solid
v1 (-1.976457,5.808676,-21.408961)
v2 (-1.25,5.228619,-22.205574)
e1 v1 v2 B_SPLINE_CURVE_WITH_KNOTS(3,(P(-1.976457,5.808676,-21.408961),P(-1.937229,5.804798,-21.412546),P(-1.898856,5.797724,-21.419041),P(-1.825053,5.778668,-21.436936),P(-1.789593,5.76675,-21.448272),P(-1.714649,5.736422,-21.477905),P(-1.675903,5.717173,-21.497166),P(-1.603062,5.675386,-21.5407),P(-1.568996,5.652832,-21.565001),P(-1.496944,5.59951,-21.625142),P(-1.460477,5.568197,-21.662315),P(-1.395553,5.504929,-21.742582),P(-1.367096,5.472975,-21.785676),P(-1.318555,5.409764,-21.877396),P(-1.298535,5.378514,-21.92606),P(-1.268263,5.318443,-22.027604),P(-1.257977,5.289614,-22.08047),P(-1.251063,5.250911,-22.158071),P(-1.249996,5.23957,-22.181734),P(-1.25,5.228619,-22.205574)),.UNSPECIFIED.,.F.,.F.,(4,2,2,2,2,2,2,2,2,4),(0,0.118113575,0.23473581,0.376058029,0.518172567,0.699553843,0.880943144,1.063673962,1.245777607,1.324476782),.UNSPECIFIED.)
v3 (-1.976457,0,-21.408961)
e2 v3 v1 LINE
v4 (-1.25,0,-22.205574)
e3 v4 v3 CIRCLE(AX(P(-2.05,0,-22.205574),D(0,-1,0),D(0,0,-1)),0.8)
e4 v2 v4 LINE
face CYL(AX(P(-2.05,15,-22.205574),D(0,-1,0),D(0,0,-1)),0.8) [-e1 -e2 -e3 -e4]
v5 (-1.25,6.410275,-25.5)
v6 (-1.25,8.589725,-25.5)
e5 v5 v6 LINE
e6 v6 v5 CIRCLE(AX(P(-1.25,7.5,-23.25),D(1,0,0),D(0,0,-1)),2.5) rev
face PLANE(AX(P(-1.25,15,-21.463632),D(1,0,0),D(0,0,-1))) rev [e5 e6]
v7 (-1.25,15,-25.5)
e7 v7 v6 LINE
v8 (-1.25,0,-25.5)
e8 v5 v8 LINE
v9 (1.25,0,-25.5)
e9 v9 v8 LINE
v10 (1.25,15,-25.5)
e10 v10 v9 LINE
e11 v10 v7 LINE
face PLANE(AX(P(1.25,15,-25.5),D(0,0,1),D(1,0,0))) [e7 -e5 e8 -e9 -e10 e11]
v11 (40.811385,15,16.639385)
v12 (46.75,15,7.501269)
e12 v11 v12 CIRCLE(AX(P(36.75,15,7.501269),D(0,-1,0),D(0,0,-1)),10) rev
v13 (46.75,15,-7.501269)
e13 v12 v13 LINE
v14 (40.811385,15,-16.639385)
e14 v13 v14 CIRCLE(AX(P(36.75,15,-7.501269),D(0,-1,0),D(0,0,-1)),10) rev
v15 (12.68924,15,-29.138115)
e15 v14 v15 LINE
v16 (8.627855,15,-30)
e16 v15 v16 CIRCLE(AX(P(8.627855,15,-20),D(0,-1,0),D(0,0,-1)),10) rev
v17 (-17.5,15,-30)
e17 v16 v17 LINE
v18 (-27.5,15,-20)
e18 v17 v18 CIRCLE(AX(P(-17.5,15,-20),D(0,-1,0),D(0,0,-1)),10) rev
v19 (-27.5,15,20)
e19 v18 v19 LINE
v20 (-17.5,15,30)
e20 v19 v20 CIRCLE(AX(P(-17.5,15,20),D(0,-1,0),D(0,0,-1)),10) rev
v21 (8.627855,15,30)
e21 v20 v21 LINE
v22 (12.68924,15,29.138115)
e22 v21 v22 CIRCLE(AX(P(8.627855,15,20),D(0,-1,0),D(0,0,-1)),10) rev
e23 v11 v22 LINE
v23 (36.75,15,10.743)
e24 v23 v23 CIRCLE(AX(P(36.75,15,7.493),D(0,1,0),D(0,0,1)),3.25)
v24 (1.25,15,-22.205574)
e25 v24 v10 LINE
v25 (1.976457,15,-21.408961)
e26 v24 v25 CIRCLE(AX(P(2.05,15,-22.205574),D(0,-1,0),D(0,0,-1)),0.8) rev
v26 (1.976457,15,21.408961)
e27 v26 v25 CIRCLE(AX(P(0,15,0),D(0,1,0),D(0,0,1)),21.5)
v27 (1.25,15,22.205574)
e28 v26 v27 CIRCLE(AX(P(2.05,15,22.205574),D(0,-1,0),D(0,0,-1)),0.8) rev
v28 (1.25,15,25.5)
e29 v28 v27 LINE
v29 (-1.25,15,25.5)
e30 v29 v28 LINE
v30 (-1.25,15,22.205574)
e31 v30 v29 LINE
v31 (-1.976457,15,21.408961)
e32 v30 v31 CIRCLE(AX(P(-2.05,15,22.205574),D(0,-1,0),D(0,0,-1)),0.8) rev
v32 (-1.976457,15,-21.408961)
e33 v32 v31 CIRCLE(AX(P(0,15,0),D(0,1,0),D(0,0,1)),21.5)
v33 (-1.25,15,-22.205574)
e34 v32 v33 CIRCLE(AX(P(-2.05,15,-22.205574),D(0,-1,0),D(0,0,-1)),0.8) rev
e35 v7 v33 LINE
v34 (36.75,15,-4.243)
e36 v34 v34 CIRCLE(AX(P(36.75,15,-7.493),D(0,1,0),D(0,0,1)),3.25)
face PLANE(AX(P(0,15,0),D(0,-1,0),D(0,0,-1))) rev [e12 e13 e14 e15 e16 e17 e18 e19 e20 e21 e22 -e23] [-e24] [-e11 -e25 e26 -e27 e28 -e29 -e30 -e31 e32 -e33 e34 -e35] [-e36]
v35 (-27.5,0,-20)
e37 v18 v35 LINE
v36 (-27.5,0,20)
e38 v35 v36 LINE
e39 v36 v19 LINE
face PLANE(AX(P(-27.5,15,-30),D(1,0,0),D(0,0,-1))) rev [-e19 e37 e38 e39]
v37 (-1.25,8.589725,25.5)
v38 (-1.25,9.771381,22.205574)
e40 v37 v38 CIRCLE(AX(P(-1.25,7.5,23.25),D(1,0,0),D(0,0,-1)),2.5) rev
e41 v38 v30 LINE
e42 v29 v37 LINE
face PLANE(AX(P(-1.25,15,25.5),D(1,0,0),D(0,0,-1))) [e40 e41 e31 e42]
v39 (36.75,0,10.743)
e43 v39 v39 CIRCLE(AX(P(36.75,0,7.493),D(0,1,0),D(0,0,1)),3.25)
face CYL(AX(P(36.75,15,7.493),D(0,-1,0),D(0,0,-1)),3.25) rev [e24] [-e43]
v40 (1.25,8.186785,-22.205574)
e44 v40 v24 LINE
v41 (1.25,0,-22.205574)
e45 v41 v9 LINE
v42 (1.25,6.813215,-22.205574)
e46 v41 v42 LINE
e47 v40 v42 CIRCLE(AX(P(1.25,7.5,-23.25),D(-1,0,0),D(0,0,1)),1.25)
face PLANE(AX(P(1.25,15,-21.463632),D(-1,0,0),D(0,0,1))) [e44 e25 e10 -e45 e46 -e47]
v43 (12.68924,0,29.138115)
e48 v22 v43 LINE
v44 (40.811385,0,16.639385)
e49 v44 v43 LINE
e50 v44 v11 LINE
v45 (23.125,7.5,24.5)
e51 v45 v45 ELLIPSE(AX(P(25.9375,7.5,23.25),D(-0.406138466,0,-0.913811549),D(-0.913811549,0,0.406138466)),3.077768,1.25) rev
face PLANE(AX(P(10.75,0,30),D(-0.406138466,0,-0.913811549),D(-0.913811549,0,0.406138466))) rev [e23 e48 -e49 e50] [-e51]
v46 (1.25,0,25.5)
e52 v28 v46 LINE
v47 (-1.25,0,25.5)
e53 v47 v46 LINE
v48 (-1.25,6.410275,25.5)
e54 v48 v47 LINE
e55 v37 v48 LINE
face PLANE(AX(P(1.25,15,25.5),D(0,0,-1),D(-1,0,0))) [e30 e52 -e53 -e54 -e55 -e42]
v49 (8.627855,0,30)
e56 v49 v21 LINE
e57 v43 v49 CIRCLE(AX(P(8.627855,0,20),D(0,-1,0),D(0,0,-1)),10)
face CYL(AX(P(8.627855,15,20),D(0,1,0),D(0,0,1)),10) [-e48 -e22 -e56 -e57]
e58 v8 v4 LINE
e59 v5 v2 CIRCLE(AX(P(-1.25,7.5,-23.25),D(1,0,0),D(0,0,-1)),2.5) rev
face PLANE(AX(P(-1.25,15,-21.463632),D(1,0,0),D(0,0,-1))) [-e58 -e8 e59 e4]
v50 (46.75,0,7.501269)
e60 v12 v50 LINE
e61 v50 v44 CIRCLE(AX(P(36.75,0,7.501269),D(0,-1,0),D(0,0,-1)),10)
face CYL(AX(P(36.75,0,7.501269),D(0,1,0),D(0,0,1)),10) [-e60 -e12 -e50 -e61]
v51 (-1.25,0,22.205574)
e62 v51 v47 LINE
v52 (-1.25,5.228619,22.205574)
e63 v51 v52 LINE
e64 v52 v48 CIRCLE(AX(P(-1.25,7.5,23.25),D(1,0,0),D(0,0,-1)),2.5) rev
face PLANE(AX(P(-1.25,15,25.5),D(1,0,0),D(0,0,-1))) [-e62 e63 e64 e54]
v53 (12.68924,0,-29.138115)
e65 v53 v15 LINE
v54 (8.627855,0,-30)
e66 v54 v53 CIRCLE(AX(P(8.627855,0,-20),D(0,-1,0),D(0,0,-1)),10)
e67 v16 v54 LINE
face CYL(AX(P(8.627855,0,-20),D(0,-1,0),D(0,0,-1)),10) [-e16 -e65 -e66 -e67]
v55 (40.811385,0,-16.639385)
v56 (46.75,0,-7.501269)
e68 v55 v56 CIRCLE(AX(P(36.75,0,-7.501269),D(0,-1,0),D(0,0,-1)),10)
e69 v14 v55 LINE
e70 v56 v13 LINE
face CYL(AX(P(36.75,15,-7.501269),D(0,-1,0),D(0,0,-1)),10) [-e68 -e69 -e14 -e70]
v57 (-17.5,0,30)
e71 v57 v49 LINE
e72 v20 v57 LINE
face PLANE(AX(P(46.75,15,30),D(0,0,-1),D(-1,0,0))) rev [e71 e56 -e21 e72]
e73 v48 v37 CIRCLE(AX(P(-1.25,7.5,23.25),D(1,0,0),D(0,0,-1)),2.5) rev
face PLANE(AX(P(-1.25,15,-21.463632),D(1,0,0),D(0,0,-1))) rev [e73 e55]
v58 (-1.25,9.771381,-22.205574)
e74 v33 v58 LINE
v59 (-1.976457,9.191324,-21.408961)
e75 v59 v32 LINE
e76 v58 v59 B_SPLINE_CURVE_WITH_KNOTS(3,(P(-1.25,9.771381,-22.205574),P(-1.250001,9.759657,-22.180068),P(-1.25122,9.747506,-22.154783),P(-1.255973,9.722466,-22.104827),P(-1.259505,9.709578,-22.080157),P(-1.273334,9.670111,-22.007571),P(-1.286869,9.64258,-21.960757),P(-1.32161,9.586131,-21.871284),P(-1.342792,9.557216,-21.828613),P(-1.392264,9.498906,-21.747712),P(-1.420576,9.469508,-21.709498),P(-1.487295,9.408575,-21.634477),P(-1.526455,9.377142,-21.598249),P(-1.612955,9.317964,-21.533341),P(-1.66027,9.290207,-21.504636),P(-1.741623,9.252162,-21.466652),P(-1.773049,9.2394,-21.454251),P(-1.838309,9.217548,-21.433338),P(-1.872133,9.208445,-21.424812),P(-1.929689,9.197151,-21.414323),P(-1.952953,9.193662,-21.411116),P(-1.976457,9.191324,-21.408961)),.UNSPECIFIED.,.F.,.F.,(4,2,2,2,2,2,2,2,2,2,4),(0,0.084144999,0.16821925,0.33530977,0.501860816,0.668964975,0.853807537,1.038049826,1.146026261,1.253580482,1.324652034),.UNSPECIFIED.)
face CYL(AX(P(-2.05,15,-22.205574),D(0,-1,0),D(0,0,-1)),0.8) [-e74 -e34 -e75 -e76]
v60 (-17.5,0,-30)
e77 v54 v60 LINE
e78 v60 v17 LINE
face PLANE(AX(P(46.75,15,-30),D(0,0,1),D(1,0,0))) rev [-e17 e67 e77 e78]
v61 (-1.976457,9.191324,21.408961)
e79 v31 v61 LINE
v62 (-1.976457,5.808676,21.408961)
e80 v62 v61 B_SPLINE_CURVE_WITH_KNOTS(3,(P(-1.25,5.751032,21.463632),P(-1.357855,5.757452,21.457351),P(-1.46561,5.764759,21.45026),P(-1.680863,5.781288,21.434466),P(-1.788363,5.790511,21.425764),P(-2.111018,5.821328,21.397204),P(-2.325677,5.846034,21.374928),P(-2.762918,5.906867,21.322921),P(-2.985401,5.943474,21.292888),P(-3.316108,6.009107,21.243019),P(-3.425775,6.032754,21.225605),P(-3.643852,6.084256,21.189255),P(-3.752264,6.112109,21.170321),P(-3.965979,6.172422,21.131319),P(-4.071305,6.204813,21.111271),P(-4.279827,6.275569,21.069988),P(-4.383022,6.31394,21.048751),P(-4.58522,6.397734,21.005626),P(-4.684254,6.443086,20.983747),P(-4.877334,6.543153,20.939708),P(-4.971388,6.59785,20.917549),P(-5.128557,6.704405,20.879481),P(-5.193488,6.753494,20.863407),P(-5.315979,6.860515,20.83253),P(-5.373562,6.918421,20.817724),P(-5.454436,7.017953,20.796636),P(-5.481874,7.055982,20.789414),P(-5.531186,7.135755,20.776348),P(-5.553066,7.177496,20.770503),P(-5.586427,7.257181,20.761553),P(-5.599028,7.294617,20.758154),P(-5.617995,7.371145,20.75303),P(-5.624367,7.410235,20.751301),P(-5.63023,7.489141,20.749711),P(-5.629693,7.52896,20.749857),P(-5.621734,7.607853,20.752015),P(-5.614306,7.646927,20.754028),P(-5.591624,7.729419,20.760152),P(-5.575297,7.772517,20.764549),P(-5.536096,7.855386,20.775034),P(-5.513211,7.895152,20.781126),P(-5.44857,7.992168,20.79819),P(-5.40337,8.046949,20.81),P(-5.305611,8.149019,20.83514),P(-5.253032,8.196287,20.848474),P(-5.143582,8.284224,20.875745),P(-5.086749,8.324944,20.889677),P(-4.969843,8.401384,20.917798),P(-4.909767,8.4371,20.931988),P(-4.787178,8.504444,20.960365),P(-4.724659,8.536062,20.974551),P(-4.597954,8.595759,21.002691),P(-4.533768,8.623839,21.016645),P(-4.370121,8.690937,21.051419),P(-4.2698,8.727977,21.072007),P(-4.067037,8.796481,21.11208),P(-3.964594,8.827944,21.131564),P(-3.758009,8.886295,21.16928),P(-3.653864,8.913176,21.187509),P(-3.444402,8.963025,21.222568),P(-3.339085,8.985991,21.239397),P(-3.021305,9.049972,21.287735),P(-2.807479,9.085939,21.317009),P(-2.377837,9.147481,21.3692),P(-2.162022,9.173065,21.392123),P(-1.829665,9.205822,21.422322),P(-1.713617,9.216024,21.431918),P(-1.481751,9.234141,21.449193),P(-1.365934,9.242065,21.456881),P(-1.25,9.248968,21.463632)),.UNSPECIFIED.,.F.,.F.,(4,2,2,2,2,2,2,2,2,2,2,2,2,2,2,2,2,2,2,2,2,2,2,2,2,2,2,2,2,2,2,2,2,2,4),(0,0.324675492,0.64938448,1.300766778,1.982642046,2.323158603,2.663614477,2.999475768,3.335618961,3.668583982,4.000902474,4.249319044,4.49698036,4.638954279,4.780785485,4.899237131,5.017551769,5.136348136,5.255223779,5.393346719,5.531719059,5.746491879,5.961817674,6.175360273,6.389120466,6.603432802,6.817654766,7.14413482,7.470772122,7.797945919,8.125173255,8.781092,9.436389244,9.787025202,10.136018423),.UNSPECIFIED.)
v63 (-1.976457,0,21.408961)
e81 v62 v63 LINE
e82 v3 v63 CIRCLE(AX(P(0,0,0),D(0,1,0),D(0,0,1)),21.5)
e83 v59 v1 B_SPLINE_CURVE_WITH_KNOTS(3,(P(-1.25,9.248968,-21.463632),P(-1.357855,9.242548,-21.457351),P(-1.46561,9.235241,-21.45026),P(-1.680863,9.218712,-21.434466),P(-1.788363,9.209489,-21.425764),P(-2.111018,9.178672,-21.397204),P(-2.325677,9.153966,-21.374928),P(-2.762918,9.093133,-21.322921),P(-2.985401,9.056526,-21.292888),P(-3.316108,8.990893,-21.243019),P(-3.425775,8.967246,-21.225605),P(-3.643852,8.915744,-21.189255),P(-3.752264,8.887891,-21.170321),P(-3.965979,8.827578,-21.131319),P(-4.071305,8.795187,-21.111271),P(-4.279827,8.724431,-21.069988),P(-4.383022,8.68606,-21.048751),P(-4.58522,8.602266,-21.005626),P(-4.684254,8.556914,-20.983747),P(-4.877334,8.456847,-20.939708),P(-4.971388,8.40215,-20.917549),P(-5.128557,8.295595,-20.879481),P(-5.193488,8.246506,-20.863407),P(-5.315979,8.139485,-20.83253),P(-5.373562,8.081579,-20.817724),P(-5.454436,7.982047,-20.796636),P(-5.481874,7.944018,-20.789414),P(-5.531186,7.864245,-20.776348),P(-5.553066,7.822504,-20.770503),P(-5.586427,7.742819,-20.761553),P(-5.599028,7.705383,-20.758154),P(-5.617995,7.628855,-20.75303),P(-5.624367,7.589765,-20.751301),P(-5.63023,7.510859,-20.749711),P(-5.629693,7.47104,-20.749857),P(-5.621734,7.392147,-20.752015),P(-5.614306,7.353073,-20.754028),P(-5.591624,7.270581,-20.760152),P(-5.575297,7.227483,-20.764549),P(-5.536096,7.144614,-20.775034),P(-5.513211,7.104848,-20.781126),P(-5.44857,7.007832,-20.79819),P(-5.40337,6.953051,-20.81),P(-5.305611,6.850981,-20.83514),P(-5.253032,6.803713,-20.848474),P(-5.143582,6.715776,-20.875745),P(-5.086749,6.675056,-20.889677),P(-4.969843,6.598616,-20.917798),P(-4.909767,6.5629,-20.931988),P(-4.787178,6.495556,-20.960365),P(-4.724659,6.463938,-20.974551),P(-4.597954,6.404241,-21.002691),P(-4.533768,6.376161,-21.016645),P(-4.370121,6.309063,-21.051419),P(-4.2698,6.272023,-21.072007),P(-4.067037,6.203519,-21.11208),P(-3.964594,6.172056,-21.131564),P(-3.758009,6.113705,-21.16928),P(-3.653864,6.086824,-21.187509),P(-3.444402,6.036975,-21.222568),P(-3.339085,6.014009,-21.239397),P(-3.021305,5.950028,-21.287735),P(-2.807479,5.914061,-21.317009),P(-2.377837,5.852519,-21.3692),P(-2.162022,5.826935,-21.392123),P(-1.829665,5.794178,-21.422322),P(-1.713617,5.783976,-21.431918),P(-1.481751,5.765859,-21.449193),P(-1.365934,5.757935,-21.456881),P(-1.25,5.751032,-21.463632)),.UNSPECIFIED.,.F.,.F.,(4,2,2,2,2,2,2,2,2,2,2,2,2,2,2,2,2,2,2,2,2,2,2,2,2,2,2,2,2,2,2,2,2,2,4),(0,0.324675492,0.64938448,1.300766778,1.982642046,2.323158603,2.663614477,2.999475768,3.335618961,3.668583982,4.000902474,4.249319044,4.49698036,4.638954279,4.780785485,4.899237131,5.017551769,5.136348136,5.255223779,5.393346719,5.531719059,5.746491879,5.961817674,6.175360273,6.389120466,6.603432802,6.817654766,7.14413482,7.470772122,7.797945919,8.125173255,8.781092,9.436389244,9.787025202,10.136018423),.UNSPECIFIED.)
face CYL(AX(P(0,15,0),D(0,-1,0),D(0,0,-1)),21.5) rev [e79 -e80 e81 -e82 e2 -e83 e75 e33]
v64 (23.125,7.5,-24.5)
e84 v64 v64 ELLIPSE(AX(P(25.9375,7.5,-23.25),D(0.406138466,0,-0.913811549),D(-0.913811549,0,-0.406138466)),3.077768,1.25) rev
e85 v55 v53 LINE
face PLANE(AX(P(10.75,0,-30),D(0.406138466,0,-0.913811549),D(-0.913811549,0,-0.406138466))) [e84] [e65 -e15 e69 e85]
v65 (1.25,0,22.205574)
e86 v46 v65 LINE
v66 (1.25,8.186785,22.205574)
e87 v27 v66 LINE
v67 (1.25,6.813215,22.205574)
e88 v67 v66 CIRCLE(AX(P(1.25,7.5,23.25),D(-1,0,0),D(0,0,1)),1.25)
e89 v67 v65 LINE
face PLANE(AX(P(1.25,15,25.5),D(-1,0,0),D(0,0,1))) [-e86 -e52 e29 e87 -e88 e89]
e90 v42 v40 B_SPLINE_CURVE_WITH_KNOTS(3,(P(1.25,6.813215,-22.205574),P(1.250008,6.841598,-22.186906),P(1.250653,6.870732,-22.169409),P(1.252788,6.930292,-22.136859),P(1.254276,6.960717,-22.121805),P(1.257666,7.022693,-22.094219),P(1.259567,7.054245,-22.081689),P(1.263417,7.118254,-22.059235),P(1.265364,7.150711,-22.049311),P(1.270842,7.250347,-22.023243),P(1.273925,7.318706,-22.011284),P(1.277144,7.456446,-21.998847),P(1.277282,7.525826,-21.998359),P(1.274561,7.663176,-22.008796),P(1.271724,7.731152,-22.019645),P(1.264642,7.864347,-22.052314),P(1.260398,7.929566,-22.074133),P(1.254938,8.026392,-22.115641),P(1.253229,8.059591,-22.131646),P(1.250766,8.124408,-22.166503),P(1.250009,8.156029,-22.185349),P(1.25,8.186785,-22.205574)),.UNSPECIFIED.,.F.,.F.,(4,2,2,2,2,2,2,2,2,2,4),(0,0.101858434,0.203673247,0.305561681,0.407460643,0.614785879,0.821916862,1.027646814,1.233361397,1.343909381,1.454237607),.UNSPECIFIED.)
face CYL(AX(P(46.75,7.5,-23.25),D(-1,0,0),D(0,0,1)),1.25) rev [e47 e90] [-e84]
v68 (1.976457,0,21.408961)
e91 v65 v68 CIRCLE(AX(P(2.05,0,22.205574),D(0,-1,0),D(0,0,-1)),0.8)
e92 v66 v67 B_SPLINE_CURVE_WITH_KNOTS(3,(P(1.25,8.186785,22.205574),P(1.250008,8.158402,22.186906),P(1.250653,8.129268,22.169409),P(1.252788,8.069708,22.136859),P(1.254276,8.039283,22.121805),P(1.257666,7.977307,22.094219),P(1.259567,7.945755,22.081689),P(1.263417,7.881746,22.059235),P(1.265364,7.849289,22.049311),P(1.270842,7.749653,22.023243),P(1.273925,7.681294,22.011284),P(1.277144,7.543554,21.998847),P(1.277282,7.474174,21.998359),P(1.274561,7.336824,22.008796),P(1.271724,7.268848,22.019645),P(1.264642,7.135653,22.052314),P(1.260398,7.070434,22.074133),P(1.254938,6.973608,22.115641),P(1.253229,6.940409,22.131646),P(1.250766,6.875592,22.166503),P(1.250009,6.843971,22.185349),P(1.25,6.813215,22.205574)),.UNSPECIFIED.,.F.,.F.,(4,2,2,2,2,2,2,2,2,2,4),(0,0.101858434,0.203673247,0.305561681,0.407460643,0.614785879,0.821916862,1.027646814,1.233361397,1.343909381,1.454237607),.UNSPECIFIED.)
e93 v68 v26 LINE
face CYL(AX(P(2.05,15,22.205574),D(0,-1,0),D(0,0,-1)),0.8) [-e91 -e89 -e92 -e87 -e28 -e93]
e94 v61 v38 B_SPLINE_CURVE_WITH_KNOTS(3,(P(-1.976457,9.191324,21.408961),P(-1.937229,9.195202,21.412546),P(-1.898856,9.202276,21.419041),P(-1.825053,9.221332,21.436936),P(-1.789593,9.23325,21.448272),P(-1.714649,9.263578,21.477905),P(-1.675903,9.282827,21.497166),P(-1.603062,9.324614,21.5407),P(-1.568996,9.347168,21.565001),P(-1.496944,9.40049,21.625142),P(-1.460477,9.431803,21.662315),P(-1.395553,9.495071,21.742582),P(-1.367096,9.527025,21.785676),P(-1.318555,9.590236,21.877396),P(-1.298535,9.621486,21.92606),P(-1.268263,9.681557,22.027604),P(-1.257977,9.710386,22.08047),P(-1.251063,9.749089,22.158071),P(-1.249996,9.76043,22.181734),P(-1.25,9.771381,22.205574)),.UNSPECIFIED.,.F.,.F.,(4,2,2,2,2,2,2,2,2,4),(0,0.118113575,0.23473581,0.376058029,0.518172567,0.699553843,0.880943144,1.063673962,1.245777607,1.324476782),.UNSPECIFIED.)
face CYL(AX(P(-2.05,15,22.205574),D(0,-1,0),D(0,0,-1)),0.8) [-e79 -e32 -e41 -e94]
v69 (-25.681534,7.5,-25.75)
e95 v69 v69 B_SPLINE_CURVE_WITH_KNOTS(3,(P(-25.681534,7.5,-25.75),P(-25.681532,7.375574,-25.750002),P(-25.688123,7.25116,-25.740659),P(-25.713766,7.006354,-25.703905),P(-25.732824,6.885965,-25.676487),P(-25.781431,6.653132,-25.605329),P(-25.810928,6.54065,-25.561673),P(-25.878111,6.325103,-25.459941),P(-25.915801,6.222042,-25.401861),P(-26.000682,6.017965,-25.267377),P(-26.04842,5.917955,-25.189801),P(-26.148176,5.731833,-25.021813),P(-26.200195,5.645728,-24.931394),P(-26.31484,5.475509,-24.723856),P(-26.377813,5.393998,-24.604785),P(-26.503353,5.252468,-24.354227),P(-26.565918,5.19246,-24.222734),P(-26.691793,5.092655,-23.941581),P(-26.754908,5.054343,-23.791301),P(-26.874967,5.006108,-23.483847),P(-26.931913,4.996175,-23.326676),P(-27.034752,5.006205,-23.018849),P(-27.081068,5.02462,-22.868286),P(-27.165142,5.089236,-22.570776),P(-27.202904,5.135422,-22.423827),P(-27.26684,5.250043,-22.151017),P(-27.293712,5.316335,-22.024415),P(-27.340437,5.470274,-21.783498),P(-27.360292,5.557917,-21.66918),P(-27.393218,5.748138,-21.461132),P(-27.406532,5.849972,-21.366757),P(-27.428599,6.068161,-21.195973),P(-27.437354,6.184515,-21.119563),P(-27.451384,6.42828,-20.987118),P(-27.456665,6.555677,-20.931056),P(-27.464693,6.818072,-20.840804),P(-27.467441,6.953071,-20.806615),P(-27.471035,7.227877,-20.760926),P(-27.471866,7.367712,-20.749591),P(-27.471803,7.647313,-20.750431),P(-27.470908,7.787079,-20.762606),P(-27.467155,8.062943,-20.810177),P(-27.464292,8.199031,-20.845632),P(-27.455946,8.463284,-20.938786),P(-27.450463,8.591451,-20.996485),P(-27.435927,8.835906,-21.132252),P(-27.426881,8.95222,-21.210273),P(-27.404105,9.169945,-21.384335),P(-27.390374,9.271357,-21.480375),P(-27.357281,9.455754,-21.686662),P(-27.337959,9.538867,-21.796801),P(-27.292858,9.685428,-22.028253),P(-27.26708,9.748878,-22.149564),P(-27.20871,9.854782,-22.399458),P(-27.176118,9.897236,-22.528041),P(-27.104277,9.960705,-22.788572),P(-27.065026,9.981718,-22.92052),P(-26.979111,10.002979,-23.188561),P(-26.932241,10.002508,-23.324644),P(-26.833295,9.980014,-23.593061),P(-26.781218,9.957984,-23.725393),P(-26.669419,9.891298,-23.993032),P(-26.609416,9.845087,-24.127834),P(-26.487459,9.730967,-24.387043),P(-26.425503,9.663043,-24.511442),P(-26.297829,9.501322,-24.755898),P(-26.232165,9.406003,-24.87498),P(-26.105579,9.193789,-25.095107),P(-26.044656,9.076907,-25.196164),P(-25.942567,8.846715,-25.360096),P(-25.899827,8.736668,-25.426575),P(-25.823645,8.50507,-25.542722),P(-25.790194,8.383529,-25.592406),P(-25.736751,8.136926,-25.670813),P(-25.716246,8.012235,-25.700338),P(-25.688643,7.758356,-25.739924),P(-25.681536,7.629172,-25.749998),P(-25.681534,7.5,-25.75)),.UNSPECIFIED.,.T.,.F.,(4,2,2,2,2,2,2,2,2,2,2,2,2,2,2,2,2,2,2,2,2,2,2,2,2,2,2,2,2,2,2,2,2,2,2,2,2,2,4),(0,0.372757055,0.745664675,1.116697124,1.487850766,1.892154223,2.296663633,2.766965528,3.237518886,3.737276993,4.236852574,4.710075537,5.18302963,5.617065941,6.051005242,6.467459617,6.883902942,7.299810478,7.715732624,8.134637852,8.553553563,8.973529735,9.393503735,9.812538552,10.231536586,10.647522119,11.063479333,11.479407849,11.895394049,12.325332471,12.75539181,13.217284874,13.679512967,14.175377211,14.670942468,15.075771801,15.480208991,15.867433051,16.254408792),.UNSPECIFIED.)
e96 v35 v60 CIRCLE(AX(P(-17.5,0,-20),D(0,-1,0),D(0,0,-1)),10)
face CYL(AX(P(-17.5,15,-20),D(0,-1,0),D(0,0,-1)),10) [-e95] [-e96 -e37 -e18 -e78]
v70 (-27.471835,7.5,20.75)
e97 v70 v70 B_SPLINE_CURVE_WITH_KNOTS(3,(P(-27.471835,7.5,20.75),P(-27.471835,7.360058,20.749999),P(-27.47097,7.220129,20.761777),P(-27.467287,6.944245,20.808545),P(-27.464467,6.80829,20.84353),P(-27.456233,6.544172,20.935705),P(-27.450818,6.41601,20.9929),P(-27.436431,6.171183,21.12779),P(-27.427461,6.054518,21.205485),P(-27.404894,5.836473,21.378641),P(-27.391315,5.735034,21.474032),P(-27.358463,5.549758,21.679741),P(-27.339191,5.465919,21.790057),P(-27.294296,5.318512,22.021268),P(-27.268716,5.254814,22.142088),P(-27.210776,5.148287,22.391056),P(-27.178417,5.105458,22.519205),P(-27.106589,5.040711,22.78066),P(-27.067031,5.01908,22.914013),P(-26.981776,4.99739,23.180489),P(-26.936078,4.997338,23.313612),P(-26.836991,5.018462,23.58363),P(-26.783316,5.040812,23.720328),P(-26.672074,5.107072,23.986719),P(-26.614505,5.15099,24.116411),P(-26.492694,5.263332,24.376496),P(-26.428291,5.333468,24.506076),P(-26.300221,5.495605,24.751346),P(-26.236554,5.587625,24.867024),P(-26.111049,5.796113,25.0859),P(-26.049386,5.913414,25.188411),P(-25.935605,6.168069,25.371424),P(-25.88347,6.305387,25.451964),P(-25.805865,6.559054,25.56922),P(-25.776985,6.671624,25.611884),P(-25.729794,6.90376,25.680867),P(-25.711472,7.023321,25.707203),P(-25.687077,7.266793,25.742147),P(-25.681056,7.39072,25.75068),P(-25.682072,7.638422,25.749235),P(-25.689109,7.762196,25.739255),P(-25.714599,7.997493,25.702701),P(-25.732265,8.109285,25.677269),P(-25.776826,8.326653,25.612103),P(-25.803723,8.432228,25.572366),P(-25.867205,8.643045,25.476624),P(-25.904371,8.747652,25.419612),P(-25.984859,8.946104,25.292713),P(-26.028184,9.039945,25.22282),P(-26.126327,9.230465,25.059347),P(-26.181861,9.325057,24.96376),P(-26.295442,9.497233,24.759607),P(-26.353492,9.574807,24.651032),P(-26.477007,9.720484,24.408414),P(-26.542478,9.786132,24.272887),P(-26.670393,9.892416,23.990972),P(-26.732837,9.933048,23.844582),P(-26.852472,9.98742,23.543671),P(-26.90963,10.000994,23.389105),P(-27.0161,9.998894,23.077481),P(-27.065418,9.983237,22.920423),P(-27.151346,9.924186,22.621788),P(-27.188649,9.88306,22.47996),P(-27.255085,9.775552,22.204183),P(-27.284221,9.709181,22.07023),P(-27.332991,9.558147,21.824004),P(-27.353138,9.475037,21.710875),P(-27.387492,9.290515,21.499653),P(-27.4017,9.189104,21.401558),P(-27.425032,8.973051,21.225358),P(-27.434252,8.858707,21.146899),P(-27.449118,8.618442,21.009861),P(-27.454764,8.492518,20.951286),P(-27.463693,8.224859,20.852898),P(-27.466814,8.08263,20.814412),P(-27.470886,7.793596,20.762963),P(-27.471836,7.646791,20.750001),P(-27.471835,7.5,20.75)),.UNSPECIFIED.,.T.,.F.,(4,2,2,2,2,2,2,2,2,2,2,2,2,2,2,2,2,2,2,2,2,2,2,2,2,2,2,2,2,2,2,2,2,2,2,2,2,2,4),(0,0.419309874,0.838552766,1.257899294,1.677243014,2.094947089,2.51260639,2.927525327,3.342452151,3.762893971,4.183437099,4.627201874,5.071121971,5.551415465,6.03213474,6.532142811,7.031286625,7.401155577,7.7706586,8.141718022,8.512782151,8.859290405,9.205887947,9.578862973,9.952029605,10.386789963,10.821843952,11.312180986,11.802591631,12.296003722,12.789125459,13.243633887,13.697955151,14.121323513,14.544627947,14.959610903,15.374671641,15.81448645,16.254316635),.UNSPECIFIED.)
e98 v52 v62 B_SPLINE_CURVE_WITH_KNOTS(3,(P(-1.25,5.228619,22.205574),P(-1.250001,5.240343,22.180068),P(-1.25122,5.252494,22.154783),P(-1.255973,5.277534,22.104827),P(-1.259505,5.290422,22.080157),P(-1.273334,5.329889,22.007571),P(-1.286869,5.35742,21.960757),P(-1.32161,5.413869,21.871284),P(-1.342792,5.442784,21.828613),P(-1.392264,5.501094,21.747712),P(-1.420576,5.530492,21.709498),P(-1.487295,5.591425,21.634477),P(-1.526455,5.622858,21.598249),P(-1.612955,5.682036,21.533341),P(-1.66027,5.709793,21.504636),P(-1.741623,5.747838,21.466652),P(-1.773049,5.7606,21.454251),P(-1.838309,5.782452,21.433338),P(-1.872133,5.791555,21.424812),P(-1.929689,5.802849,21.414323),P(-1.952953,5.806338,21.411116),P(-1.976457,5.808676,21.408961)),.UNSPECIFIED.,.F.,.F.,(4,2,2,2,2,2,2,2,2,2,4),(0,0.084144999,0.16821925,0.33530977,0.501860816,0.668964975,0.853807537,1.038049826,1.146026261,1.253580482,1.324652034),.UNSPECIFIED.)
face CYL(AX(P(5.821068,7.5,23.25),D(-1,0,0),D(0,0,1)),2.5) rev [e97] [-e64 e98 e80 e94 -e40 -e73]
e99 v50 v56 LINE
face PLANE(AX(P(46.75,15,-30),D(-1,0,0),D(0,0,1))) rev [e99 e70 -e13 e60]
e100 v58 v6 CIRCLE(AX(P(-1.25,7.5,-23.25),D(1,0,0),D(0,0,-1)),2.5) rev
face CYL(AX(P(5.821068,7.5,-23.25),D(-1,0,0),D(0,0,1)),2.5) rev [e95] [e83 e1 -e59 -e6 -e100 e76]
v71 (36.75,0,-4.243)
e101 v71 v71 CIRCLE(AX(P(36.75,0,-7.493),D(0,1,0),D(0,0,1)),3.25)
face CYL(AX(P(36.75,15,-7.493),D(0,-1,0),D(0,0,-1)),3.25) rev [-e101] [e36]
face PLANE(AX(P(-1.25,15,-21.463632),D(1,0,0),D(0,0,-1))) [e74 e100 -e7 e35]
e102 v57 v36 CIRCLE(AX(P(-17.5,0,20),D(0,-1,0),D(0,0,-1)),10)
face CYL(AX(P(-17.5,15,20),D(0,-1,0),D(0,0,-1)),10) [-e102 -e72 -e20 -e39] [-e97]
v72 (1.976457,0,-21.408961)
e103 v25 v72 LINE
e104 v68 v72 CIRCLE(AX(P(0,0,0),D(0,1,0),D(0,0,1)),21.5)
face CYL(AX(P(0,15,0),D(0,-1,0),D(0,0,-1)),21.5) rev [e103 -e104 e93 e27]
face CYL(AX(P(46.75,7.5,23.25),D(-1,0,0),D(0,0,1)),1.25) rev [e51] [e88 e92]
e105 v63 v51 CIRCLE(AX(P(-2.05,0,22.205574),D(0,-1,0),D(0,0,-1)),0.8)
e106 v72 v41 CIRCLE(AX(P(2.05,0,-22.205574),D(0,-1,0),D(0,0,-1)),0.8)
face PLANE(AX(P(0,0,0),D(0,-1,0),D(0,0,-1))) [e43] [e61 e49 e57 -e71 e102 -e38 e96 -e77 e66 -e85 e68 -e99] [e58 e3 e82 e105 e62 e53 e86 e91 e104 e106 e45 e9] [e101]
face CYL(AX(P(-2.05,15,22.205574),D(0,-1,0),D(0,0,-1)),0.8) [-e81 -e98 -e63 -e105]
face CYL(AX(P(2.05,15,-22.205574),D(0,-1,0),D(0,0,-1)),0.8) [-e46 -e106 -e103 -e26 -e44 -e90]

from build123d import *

# Parameters (mm, degrees)
SKETCH1_W           = 74.25
SKETCH1_H           = 60
SKETCH1_R           = 3.25
BOSS_EXTRUDE1_DEPTH = 15
SKETCH2_R           = 1.25
CUT_EXTRUDE1_DEPTH  = 82.474305766
CUT_EXTRUDE2_REACH  = 83.474
SKETCH3_R           = 2.5
CUT_EXTRUDE3_DEPTH  = 58.537487806
FILLET1_R           = 10
FILLET2_R           = 0.8


with BuildPart() as part:
    # Sketch1 → Boss-Extrude1 (new body)
    with BuildSketch(Plane(origin=(0, 0, 0), x_dir=(1, 0, 0), z_dir=(0, 1, 0))):
        with Locations((9.625, 0)):
            Rectangle(SKETCH1_W, SKETCH1_H)
        with Locations(Location((36.75, 7.493, 0), (0, 0, 270))):
            Circle(SKETCH1_R, mode=Mode.SUBTRACT)
        with Locations(Location((36.75, -7.493, 0), (0, 0, 270))):
            Circle(SKETCH1_R, mode=Mode.SUBTRACT)
        with BuildLine():
            Line((-1.25, 21.463632032), (-1.25, 25.5))
            Line((-1.25, 25.5), (1.25, 25.5))
            Line((1.25, 25.5), (1.25, 21.463632032))
            ThreePointArc((1.25, 21.463632032), (21.5, 0), (1.25, -21.463632032))
            Line((1.25, -21.463632032), (1.25, -25.5))
            Line((1.25, -25.5), (-1.25, -25.5))
            Line((-1.25, -25.5), (-1.25, -21.463632032))
            ThreePointArc((-1.25, -21.463632032), (-21.5, 0), (-1.25, 21.463632032))
        make_face(mode=Mode.SUBTRACT)
    extrude(amount=BOSS_EXTRUDE1_DEPTH)

    # Sketch2 → Cut-Extrude1 (cut, through all)
    with BuildSketch(Plane.ZY.offset(27.5)):
        with Locations((-23.25, 7.5)):
            Circle(SKETCH2_R)
        with Locations((23.25, 7.5)):
            Circle(SKETCH2_R)
    extrude(amount=-CUT_EXTRUDE1_DEPTH, mode=Mode.SUBTRACT)

    # Cut-Extrude2: up to this face of the body (flat: up to its plane)
    cut_extrude2_end = Plane(part.part.faces().sort_by_distance((-1.25, 7.5, -21.618967883))[0])
    # Sketch3 → Cut-Extrude2 (cut, up to the picked face)
    with BuildSketch(Plane.ZY.offset(27.5), mode=Mode.PRIVATE) as cut_extrude2_sk1:
        with Locations((-23.25, 7.5)):
            Circle(SKETCH3_R)
    cut_extrude2_tool1 = split(extrude(cut_extrude2_sk1.sketch, amount=-CUT_EXTRUDE2_REACH, mode=Mode.PRIVATE), bisect_by=cut_extrude2_end, keep=Keep.BOTH, mode=Mode.PRIVATE)
    # Sketch3 → Cut-Extrude2 (cut, up to the picked face)
    with BuildSketch(Plane.ZY.offset(27.5), mode=Mode.PRIVATE) as cut_extrude2_sk2:
        with Locations((23.25, 7.5)):
            Circle(SKETCH3_R)
    cut_extrude2_tool2 = split(extrude(cut_extrude2_sk2.sketch, amount=-CUT_EXTRUDE2_REACH, mode=Mode.PRIVATE), bisect_by=cut_extrude2_end, keep=Keep.BOTH, mode=Mode.PRIVATE)
    add(cut_extrude2_tool1.solids().sort_by(Axis((-27.5, 7.5, -23.25), (1, 0, 0)))[0], mode=Mode.SUBTRACT)
    add(cut_extrude2_tool2.solids().sort_by(Axis((-27.5, 7.5, 23.25), (1, 0, 0)))[0], mode=Mode.SUBTRACT)

    # Sketch4 → Cut-Extrude3 (cut, through all)
    with BuildSketch(Plane(origin=(0, 15, 0), x_dir=(1, 0, 0), z_dir=(0, 1, 0))):
        Polygon((10.75, -30), (46.75, -14), (46.75, -30), align=None)
    cut_extrude3 = extrude(amount=-CUT_EXTRUDE3_DEPTH, mode=Mode.SUBTRACT)

    # Mirror1: Cut-Extrude3 across plane
    add(cut_extrude3.mirror(Plane.XY), mode=Mode.SUBTRACT)

    # Fillet1
    # the kernel refuses this fillet: 10 mm, written as the material it takes off along each edge
    with BuildSketch(Plane(origin=(46.75, 31.246827227, -14), x_dir=(-0.9138115486202572, 0, -0.4061384660534477), z_dir=(0, -1, 0))) as fillet1_piece_1:
        with BuildLine():
            CenterArc((FILLET1_R * 0.649873089088, -FILLET1_R), FILLET1_R, 90, 66.037511025)
            Line((-FILLET1_R * 0.263938459532, -FILLET1_R * 0.593861533947), (0, 0))
            Line((0, 0), (FILLET1_R * 0.649873089088, 0))
        make_face()
    extrude(amount=47.493654454, mode=Mode.SUBTRACT)
    with BuildSketch(Plane(origin=(10.75, 20.305361261, -30), x_dir=(-1, 0, 0), z_dir=(0, -1, 0)), Plane(origin=(10.75, 20.305361261, 30), x_dir=(0.9138115486202572, 0, -0.4061384660534476), z_dir=(0, -1, 0))) as fillet1_piece_2:
        with BuildLine():
            CenterArc((FILLET1_R * 0.212214450449, -FILLET1_R), FILLET1_R, 90, 23.962488975)
            Line((-FILLET1_R * 0.193924015604, -FILLET1_R * 0.0861884513797), (0, 0))
            Line((0, 0), (FILLET1_R * 0.212214450449, 0))
        make_face()
    extrude(amount=25.610722522, mode=Mode.SUBTRACT)
    with BuildSketch(Plane(origin=(-27.5, -25, 30), x_dir=(0, 0, -1), z_dir=(0, 1, 0)), Plane(origin=(-27.5, -25, -30), x_dir=(1, 0, 0), z_dir=(0, 1, 0))) as fillet1_piece_3:
        with BuildLine():
            CenterArc((FILLET1_R, -FILLET1_R), FILLET1_R, 90, 90)
            Line((0, -FILLET1_R), (0, 0))
            Line((0, 0), (FILLET1_R, 0))
        make_face()
    extrude(amount=65, mode=Mode.SUBTRACT)
    with BuildSketch(Plane(origin=(46.75, 31.246827227, 14), x_dir=(-0.9138115486202572, 0, 0.4061384660534477), z_dir=(0, -1, 0))) as fillet1_piece_4:
        with BuildLine():
            CenterArc((FILLET1_R * 0.649873089088, FILLET1_R), FILLET1_R, 203.962488975, 66.037511025)
            Line((-FILLET1_R * 0.263938459532, FILLET1_R * 0.593861533947), (0, 0))
            Line((0, 0), (FILLET1_R * 0.649873089088, 0))
        make_face()
    extrude(amount=47.493654454, mode=Mode.SUBTRACT)

    # Fillet2
    # the kernel refuses this fillet: 0.8 mm, written as the material it takes off along each edge
    with BuildSketch(Plane(origin=(1.25, -1.854853982, 21.463632032), x_dir=(0.9971801734895888, 0, -0.07504466402932025), z_dir=(0, 1, 0))) as fillet2_piece_1:
        with BuildLine():
            CenterArc((0.742065381, -0.799885177), FILLET2_R, 90.970759103, 84.725452299)
            Line((-0.055678758, -0.739849446), (0, 0))
            ThreePointArc((0, 0), (0.364255838, -0.003085857), (0.728511676, 0))
        make_face()
    extrude(amount=18.709707964, mode=Mode.SUBTRACT)
    with BuildSketch(Plane(origin=(-1.25, -1.854853982, 21.463632032), x_dir=(-0.9971801734895881, 0, -0.07504466402932955), z_dir=(0, 1, 0)), Plane(origin=(-1.25, 7.394114137, 21.463632032), x_dir=(-0.9971801734895881, 0, -0.07504466402932955), z_dir=(0, 1, 0))) as fillet2_piece_2:
        with BuildLine():
            CenterArc((0.742065381, 0.799885177), FILLET2_R, 184.303788597, 84.725452299)
            Line((-0.055678758, 0.739849446), (0, 0))
            ThreePointArc((0, 0), (0.364255838, 0.003085857), (0.728511676, 0))
        make_face()
    extrude(amount=9.460739845, mode=Mode.SUBTRACT)
    with BuildSketch(Plane(origin=(-1.25, 7.394114137, -21.463632032), x_dir=(-0.9971801734895888, 0, 0.07504466402932025), z_dir=(0, 1, 0))) as fillet2_piece_3:
        with BuildLine():
            CenterArc((0.742065381, -0.799885177), FILLET2_R, 90.970759103, 84.725452299)
            Line((-0.055678758, -0.739849446), (0, 0))
            ThreePointArc((0, 0), (0.364255838, -0.003085857), (0.728511676, 0))
        make_face()
    extrude(amount=9.460739845, mode=Mode.SUBTRACT)
    with BuildSketch(Plane(origin=(-1.25, -1.854853982, -21.463632032), x_dir=(0, 0, -1), z_dir=(0, 1, 0))) as fillet2_piece_4:
        with BuildLine():
            CenterArc((0.741941593, 0.8), FILLET2_R, 185.274547701, 84.725452299)
            ThreePointArc((-0.054670914, 0.726457399), (-0.024258302, 0.363460277), (0, 0))
            Line((0, 0), (0.741941593, 0))
        make_face()
    extrude(amount=9.460739845, mode=Mode.SUBTRACT)
    with BuildSketch(Plane(origin=(1.25, -1.854853982, -21.463632032), x_dir=(0, 0, -1), z_dir=(0, 1, 0))) as fillet2_piece_5:
        with BuildLine():
            CenterArc((0.741941593, -0.8), FILLET2_R, 90, 84.725452299)
            ThreePointArc((-0.054670914, -0.726457399), (-0.024258302, -0.363460277), (0, 0))
            Line((0, 0), (0.741941593, 0))
        make_face()
    extrude(amount=18.709707964, mode=Mode.SUBTRACT)


solid = part.part
